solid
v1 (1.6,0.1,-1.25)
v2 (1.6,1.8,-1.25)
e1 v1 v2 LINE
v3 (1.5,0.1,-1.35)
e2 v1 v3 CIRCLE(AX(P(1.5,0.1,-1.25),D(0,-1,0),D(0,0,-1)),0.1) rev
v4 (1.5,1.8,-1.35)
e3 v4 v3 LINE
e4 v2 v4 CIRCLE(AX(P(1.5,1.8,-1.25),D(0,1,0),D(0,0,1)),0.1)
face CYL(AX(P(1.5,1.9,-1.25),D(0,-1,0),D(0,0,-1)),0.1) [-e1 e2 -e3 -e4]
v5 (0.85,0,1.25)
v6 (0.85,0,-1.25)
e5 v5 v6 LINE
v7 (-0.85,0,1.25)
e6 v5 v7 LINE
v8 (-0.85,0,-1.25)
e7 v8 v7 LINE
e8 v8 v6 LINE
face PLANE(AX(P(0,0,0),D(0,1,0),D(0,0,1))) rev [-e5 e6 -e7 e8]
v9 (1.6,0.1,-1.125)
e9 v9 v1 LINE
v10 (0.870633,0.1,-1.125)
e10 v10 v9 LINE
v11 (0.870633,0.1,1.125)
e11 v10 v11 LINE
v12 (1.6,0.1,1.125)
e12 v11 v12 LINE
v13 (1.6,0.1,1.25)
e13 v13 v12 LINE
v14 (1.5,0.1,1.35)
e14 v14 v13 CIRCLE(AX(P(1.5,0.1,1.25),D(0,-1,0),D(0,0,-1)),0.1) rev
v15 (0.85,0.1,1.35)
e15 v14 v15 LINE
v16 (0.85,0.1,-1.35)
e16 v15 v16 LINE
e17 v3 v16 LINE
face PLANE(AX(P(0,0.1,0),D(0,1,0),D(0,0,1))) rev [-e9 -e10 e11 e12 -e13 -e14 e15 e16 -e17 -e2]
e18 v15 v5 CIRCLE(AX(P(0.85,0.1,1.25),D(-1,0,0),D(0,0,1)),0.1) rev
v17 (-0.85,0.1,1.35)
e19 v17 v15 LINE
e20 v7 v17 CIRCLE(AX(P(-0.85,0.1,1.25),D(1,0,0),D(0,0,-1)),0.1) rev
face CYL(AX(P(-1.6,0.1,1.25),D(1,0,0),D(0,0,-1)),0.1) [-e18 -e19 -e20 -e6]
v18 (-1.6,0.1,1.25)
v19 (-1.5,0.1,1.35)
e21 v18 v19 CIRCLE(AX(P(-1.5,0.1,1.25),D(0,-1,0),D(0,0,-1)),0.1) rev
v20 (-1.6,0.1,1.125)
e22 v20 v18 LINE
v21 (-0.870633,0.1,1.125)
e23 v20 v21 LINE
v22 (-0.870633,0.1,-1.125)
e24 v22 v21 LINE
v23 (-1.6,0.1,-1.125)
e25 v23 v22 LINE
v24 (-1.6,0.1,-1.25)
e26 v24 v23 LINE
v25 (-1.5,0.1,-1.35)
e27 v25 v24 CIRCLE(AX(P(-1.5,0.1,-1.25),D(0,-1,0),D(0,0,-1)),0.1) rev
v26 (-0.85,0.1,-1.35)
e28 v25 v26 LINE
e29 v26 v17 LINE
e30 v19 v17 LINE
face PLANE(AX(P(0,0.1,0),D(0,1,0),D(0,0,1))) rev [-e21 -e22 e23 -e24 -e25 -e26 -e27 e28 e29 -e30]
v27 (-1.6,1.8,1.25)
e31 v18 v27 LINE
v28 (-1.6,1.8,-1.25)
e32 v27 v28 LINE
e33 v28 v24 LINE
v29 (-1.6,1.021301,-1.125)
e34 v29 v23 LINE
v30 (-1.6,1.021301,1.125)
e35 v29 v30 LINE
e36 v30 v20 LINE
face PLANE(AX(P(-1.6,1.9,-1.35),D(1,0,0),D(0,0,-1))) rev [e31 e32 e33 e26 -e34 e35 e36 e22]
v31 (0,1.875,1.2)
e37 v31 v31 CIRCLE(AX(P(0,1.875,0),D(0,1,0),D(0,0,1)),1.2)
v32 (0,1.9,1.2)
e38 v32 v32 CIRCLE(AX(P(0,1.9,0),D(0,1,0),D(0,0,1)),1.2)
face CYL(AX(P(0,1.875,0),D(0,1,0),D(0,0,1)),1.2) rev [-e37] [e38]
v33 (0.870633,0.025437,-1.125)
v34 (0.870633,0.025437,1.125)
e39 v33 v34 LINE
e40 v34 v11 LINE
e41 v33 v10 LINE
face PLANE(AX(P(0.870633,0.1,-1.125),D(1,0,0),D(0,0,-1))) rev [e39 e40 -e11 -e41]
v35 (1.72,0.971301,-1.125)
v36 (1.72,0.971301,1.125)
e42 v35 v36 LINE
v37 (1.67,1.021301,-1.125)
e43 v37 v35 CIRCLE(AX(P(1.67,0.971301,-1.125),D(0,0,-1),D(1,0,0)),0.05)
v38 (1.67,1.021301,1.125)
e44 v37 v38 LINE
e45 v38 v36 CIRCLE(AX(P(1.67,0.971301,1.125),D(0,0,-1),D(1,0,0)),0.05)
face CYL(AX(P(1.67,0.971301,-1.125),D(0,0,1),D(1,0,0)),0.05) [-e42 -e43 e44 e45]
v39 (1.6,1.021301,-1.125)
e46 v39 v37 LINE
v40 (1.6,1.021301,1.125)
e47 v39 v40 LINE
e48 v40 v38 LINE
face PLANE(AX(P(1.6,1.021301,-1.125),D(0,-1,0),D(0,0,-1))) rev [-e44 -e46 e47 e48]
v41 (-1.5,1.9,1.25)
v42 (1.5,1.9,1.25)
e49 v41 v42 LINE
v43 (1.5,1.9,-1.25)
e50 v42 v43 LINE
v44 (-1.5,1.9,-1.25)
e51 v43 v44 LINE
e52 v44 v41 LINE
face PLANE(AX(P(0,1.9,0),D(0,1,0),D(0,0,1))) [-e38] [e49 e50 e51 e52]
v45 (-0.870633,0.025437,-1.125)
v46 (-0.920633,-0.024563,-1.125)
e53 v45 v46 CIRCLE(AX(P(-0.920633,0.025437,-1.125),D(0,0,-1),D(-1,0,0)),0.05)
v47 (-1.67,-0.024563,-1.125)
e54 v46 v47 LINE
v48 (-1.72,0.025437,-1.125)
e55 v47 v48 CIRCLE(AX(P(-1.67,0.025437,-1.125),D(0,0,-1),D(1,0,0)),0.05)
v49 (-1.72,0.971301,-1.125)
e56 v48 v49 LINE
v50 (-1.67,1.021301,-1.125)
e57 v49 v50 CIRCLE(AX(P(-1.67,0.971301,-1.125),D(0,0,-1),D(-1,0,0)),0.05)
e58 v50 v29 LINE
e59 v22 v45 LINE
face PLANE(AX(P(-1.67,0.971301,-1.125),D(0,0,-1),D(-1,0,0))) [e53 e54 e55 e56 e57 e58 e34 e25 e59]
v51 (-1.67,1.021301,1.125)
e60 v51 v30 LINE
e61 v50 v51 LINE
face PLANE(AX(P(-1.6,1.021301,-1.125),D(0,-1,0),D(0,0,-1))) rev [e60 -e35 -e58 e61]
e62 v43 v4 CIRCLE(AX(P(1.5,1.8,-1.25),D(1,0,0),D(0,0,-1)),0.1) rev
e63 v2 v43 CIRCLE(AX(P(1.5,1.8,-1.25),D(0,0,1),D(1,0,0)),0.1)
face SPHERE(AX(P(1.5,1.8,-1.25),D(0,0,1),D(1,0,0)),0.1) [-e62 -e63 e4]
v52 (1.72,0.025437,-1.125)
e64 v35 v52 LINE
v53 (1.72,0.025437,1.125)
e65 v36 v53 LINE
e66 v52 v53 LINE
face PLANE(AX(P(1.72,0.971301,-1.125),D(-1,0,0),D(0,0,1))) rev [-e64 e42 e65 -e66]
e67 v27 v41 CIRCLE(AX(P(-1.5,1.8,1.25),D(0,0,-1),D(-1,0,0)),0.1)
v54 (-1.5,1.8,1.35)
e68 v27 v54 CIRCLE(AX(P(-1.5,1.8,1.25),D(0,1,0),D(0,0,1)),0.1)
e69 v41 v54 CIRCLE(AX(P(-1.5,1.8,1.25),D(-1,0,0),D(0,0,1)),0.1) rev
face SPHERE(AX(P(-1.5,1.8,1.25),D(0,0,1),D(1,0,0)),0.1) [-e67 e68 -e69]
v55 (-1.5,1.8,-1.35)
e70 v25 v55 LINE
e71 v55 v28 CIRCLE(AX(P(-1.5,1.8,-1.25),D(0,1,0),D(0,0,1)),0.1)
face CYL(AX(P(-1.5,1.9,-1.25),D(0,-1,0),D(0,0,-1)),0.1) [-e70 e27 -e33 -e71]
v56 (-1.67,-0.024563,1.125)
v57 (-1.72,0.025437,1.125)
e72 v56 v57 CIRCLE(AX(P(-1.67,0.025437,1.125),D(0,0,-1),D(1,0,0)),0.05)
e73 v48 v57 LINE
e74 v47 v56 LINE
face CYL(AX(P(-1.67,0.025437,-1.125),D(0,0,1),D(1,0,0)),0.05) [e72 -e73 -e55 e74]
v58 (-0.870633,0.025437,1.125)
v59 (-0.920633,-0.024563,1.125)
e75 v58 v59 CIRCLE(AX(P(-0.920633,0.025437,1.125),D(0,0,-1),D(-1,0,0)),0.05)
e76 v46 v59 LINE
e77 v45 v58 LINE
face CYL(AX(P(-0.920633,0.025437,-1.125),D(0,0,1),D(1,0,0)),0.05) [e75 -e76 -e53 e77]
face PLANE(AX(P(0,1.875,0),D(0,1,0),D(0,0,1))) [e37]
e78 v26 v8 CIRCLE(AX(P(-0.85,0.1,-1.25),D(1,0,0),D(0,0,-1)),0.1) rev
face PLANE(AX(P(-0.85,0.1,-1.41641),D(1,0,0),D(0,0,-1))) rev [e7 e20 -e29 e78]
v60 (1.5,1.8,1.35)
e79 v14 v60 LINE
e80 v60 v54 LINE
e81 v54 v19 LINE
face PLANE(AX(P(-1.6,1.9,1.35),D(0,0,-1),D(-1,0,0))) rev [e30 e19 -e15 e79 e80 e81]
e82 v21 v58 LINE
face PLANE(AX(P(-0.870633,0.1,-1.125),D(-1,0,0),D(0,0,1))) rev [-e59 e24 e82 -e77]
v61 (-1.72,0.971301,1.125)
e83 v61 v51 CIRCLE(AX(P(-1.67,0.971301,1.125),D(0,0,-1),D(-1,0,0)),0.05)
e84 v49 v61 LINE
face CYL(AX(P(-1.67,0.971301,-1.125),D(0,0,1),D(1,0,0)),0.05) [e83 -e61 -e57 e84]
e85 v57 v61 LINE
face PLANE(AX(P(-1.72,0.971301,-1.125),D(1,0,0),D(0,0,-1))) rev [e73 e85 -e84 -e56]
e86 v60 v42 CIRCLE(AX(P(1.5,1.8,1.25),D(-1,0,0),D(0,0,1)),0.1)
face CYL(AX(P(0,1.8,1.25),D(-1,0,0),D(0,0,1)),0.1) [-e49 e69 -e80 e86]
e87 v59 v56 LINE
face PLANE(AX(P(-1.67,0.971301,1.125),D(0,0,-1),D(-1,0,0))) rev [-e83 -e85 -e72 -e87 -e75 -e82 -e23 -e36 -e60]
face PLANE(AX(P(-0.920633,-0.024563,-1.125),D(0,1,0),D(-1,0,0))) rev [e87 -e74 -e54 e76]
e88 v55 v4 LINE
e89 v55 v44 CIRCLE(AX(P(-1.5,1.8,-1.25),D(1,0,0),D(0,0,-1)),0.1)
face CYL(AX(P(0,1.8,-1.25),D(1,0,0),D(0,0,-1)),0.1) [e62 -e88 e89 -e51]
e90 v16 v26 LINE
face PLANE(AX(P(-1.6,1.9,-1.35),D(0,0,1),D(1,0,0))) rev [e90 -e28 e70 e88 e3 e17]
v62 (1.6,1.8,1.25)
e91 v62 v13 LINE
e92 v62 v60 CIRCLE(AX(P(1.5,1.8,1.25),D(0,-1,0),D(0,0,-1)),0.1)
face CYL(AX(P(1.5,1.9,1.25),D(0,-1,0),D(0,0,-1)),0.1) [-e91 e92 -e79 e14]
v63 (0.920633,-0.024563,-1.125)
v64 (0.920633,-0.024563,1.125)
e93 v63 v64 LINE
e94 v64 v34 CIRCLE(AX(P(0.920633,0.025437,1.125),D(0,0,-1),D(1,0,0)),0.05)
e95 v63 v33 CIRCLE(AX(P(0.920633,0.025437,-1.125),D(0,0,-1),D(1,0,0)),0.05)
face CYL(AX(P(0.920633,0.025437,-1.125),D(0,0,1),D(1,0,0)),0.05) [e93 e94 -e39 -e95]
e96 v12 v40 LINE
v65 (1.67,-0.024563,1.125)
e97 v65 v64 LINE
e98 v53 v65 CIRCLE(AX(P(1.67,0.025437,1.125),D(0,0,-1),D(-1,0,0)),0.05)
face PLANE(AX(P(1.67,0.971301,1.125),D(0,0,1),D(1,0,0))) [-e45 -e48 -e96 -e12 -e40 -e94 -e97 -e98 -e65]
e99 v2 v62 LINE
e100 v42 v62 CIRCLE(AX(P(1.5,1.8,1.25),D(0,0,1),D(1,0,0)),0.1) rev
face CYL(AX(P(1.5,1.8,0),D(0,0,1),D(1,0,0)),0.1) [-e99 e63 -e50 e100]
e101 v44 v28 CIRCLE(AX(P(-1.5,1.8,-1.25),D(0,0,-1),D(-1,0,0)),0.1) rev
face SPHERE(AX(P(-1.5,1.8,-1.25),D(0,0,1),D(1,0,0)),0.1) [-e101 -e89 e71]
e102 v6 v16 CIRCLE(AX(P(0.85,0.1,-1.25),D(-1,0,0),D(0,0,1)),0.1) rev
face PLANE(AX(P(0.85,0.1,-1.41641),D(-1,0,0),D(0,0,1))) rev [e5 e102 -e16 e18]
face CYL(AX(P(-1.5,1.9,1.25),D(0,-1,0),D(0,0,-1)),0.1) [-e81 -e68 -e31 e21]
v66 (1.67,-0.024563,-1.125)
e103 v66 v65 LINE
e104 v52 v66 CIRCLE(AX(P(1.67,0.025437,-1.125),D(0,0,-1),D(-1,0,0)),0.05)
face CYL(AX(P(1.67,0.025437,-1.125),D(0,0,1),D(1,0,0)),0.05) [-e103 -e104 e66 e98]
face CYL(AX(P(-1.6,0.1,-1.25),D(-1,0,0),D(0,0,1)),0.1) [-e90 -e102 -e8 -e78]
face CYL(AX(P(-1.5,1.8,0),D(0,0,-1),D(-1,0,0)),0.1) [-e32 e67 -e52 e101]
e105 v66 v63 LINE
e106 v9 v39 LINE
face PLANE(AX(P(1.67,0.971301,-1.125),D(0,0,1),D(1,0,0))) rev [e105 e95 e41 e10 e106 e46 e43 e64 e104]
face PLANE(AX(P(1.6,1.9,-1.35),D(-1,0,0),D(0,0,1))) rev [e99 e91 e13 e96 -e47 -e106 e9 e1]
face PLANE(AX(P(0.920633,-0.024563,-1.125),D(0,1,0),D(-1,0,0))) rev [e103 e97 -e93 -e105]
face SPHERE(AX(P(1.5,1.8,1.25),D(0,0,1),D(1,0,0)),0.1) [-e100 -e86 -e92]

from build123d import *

# Parameters (mm, degrees)
SKETCH_2_W          = 3.2
SKETCH_2_H          = 2.7
EXTRUDE_1_DEPTH     = 1.9
FILLET_1_R          = 0.1
FILLET_2_R          = 0.1
FILLET_3_R          = 0.1
FILLET_4_R          = 0.1
FILLET_5_R          = 0.1
SKETCH_3_R          = 1.2
CUT_EXTRUDE_1_DEPTH = 0.025
SKETCH_4_W          = 0.827754981
SKETCH_4_H          = 2.835918068
CUT_EXTRUDE_2_DEPTH = 0.1
EXTRUDE_3_DEPTH     = 1.125


with BuildPart() as part:
    # Эскиз2 → Бобышка-Вытянуть1 (new body)
    with BuildSketch(Plane(origin=(0, 0, 0), x_dir=(1, 0, 0), z_dir=(0, 1, 0))):
        Rectangle(SKETCH_2_W, SKETCH_2_H)
    extrude(amount=EXTRUDE_1_DEPTH)

    # Скругление1
    fillet_1_edges = [part.edges().sort_by_distance(p)[0] for p in [
        (-1.6, 1.9, 0),
        (0, 1.9, 1.35),
        (1.6, 1.9, 0),
        (0, 1.9, -1.35),
    ]]
    fillet(fillet_1_edges, radius=FILLET_1_R)

    # Скругление2
    # the kernel refuses this fillet: 0.1 mm, written as the material it takes off along each edge
    with BuildSketch(Plane(origin=(-1.5, 1.8, 1.25), x_dir=(0, 0, 1), z_dir=(-1, 0, 0))) as fillet_2_piece_1_section:
        Polygon((0, 0), (FILLET_2_R, 0), (FILLET_2_R, FILLET_2_R), (0, FILLET_2_R), align=None)
    fillet_2_piece_1 = extrude(amount=FILLET_2_R, mode=Mode.PRIVATE)
    fillet_2_piece_1 = fillet_2_piece_1 - Plane(origin=(-1.5, 1.8, 1.25), x_dir=(0, -0.7071067811865475, -0.7071067811865475), z_dir=(-1, 0, 0)) * Sphere(FILLET_2_R, mode=Mode.PRIVATE)
    add(fillet_2_piece_1, mode=Mode.SUBTRACT)
    with BuildSketch(Plane(origin=(1.5, 1.8, 1.25), x_dir=(0, 0, 1), z_dir=(1, 0, 0))) as fillet_2_piece_2_section:
        Polygon((0, 0), (FILLET_2_R, 0), (FILLET_2_R, -FILLET_2_R), (0, -FILLET_2_R), align=None)
    fillet_2_piece_2 = extrude(amount=FILLET_2_R, mode=Mode.PRIVATE)
    fillet_2_piece_2 = fillet_2_piece_2 - Plane(origin=(1.5, 1.8, 1.25), x_dir=(0, -0.7071067811865475, -0.7071067811865475), z_dir=(1, 0, 0)) * Sphere(FILLET_2_R, mode=Mode.PRIVATE)
    add(fillet_2_piece_2, mode=Mode.SUBTRACT)
    with BuildSketch(Plane(origin=(1.6, -0.25, 1.35), x_dir=(0, 0, -1), z_dir=(0, 1, 0))) as fillet_2_piece_3:
        with BuildLine():
            CenterArc((FILLET_2_R, FILLET_2_R), FILLET_2_R, 180, 90)
            Line((0, FILLET_2_R), (0, 0))
            Line((0, 0), (FILLET_2_R, 0))
        make_face()
    extrude(amount=2.05, mode=Mode.SUBTRACT)
    with BuildSketch(Plane(origin=(-1.6, -0.25, 1.35), x_dir=(0, 0, -1), z_dir=(0, 1, 0))) as fillet_2_piece_4:
        with BuildLine():
            CenterArc((FILLET_2_R, -FILLET_2_R), FILLET_2_R, 90, 90)
            Line((0, -FILLET_2_R), (0, 0))
            Line((0, 0), (FILLET_2_R, 0))
        make_face()
    extrude(amount=2.05, mode=Mode.SUBTRACT)
    with BuildSketch(Plane(origin=(1.85, 0, 1.35), x_dir=(0, 0, -1), z_dir=(-1, 0, 0))) as fillet_2_piece_5:
        with BuildLine():
            CenterArc((FILLET_2_R, -FILLET_2_R), FILLET_2_R, 90, 90)
            Line((0, -FILLET_2_R), (0, 0))
            Line((0, 0), (FILLET_2_R, 0))
        make_face()
    extrude(amount=3.7, mode=Mode.SUBTRACT)

    # Скругление3
    # the kernel refuses this fillet: 0.1 mm, written as the material it takes off along each edge
    with BuildSketch(Plane(origin=(1.5, 1.8, -1.25), x_dir=(1, 0, 0), z_dir=(0, 0, -1))) as fillet_3_piece_1_section:
        Polygon((0, 0), (FILLET_3_R, 0), (FILLET_3_R, -FILLET_3_R), (0, -FILLET_3_R), align=None)
    fillet_3_piece_1 = extrude(amount=FILLET_3_R, mode=Mode.PRIVATE)
    fillet_3_piece_1 = fillet_3_piece_1 - Plane(origin=(1.5, 1.8, -1.25), x_dir=(-0.7071067811865475, -0.7071067811865475, 0), z_dir=(0, 0, -1)) * Sphere(FILLET_3_R, mode=Mode.PRIVATE)
    add(fillet_3_piece_1, mode=Mode.SUBTRACT)
    with BuildSketch(Plane(origin=(1.5, 0.1, 1.25), x_dir=(1, 0, 0), z_dir=(0, -1, 0))) as fillet_3_piece_2_section:
        Polygon((0, 0), (FILLET_3_R, 0), (FILLET_3_R, FILLET_3_R), (0, FILLET_3_R), align=None)
    fillet_3_piece_2 = extrude(amount=FILLET_3_R, mode=Mode.PRIVATE)
    fillet_3_piece_2 = fillet_3_piece_2 - Plane(origin=(1.5, 0.1, 1.25), x_dir=(-0.7071067811865476, 0, -0.7071067811865475), z_dir=(0, -1, 0)) * Sphere(FILLET_3_R, mode=Mode.PRIVATE)
    add(fillet_3_piece_2, mode=Mode.SUBTRACT)
    with BuildSketch(Plane(origin=(1.6, -0.25, -1.35), x_dir=(-1, 0, 0), z_dir=(0, 1, 0))) as fillet_3_piece_3:
        with BuildLine():
            CenterArc((FILLET_3_R, FILLET_3_R), FILLET_3_R, 180, 90)
            Line((0, FILLET_3_R), (0, 0))
            Line((0, 0), (FILLET_3_R, 0))
        make_face()
    extrude(amount=2.05, mode=Mode.SUBTRACT)
    with BuildSketch(Plane(origin=(1.6, 0, -1.6), x_dir=(-1, 0, 0), z_dir=(0, 0, 1))) as fillet_3_piece_4:
        with BuildLine():
            CenterArc((FILLET_3_R, -FILLET_3_R), FILLET_3_R, 90, 90)
            Line((0, -FILLET_3_R), (0, 0))
            Line((0, 0), (FILLET_3_R, 0))
        make_face()
    extrude(amount=2.85, mode=Mode.SUBTRACT)

    # Скругление4
    # the kernel refuses this fillet: 0.1 mm, written as the material it takes off along each edge
    with BuildSketch(Plane(origin=(-1.5, 1.8, -1.25), x_dir=(-1, 0, 0), z_dir=(0, 0, -1))) as fillet_4_piece_1_section:
        Polygon((0, 0), (FILLET_4_R, 0), (FILLET_4_R, FILLET_4_R), (0, FILLET_4_R), align=None)
    fillet_4_piece_1 = extrude(amount=FILLET_4_R, mode=Mode.PRIVATE)
    fillet_4_piece_1 = fillet_4_piece_1 - Plane(origin=(-1.5, 1.8, -1.25), x_dir=(0.7071067811865475, -0.7071067811865475, 0), z_dir=(0, 0, -1)) * Sphere(FILLET_4_R, mode=Mode.PRIVATE)
    add(fillet_4_piece_1, mode=Mode.SUBTRACT)
    with BuildSketch(Plane(origin=(1.5, 0.1, -1.25), x_dir=(0, -1, 0), z_dir=(0, 0, -1))) as fillet_4_piece_2_section:
        Polygon((0, 0), (FILLET_4_R, 0), (FILLET_4_R, -FILLET_4_R), (0, -FILLET_4_R), align=None)
    fillet_4_piece_2 = extrude(amount=FILLET_4_R, mode=Mode.PRIVATE)
    fillet_4_piece_2 = fillet_4_piece_2 - Plane(origin=(1.5, 0.1, -1.25), x_dir=(-0.7071067811865475, 0.7071067811865475, 0), z_dir=(0, 0, -1)) * Sphere(FILLET_4_R, mode=Mode.PRIVATE)
    add(fillet_4_piece_2, mode=Mode.SUBTRACT)
    with BuildSketch(Plane(origin=(-1.6, -0.25, -1.35), x_dir=(1, 0, 0), z_dir=(0, 1, 0))) as fillet_4_piece_3:
        with BuildLine():
            CenterArc((FILLET_4_R, -FILLET_4_R), FILLET_4_R, 90, 90)
            Line((0, -FILLET_4_R), (0, 0))
            Line((0, 0), (FILLET_4_R, 0))
        make_face()
    extrude(amount=2.05, mode=Mode.SUBTRACT)
    with BuildSketch(Plane(origin=(-1.85, 0, -1.35), x_dir=(0, 1, 0), z_dir=(1, 0, 0))) as fillet_4_piece_4:
        with BuildLine():
            CenterArc((FILLET_4_R, FILLET_4_R), FILLET_4_R, 180, 90)
            Line((0, FILLET_4_R), (0, 0))
            Line((0, 0), (FILLET_4_R, 0))
        make_face()
    extrude(amount=3.35, mode=Mode.SUBTRACT)

    # Скругление5
    # the kernel refuses this fillet: 0.1 mm, written as the material it takes off along each edge
    with BuildSketch(Plane(origin=(-1.5, 0.1, 1.25), x_dir=(-1, 0, 0), z_dir=(0, -1, 0))) as fillet_5_piece_1_section:
        Polygon((0, 0), (FILLET_5_R, 0), (FILLET_5_R, -FILLET_5_R), (0, -FILLET_5_R), align=None)
    fillet_5_piece_1 = extrude(amount=FILLET_5_R, mode=Mode.PRIVATE)
    fillet_5_piece_1 = fillet_5_piece_1 - Plane(origin=(-1.5, 0.1, 1.25), x_dir=(0.7071067811865475, 0, -0.7071067811865477), z_dir=(0, -1, 0)) * Sphere(FILLET_5_R, mode=Mode.PRIVATE)
    add(fillet_5_piece_1, mode=Mode.SUBTRACT)
    with BuildSketch(Plane(origin=(-1.5, 0.1, -1.25), x_dir=(-1, 0, 0), z_dir=(0, -1, 0))) as fillet_5_piece_2_section:
        Polygon((0, 0), (FILLET_5_R, 0), (FILLET_5_R, FILLET_5_R), (0, FILLET_5_R), align=None)
    fillet_5_piece_2 = extrude(amount=FILLET_5_R, mode=Mode.PRIVATE)
    fillet_5_piece_2 = fillet_5_piece_2 - Plane(origin=(-1.5, 0.1, -1.25), x_dir=(0.7071067811865476, 0, 0.7071067811865475), z_dir=(0, -1, 0)) * Sphere(FILLET_5_R, mode=Mode.PRIVATE)
    add(fillet_5_piece_2, mode=Mode.SUBTRACT)
    with BuildSketch(Plane(origin=(-1.6, 0, 1.25), x_dir=(1, 0, 0), z_dir=(0, 0, -1))) as fillet_5_piece_3:
        with BuildLine():
            CenterArc((FILLET_5_R, -FILLET_5_R), FILLET_5_R, 90, 90)
            Line((0, -FILLET_5_R), (0, 0))
            Line((0, 0), (FILLET_5_R, 0))
        make_face()
    extrude(amount=2.5, mode=Mode.SUBTRACT)

    # Эскиз3 → Вырез-Вытянуть1 (cut)
    with BuildSketch(Plane(origin=(0, 1.9, 0), x_dir=(1, 0, 0), z_dir=(0, 1, 0))):
        with Locations(Location((0, 0, 0), (0, 0, 270))):
            Circle(SKETCH_3_R)
    extrude(amount=-CUT_EXTRUDE_1_DEPTH, mode=Mode.SUBTRACT)

    # Эскиз4 → Вырез-Вытянуть2 (cut)
    with BuildSketch(Plane.XZ):
        with Locations((1.263877491, 0.001548995)):
            Rectangle(SKETCH_4_W, SKETCH_4_H)
        with Locations((-1.263877491, 0.001548995)):
            Rectangle(SKETCH_4_W, SKETCH_4_H)
    extrude(amount=-CUT_EXTRUDE_2_DEPTH, mode=Mode.SUBTRACT)

    # Эскиз6 → Бобышка-Вытянуть3 (add, symmetric)
    with BuildSketch(Plane(origin=(0, 0, 0), x_dir=(-1, 0, 0), z_dir=(0, 0, -1))):
        with BuildLine():
            Line((1.6, 0.1), (0.87063337, 0.1))
            Line((0.87063337, 0.1), (0.87063337, 0.025437095))
            ThreePointArc((0.87063337, 0.025437095), (0.885278031, -0.009918244), (0.92063337, -0.024562905))
            Line((0.92063337, -0.024562905), (1.67, -0.024562905))
            ThreePointArc((1.67, -0.024562905), (1.705355339, -0.009918244), (1.72, 0.025437095))
            Line((1.72, 0.025437095), (1.72, 0.971300934))
            ThreePointArc((1.72, 0.971300934), (1.705355339, 1.006656273), (1.67, 1.021300934))
            Line((1.67, 1.021300934), (1.6, 1.021300934))
            Line((1.6, 1.021300934), (1.6, 0.1))
        make_face()
        with BuildLine():
            Line((-1.6, 1.021300934), (-1.67, 1.021300934))
            ThreePointArc((-1.67, 1.021300934), (-1.705355339, 1.006656273), (-1.72, 0.971300934))
            Line((-1.72, 0.971300934), (-1.72, 0.025437095))
            ThreePointArc((-1.72, 0.025437095), (-1.705355339, -0.009918244), (-1.67, -0.024562905))
            Line((-1.67, -0.024562905), (-0.92063337, -0.024562905))
            ThreePointArc((-0.92063337, -0.024562905), (-0.885278031, -0.009918244), (-0.87063337, 0.025437095))
            Line((-0.87063337, 0.025437095), (-0.87063337, 0.1))
            Line((-0.87063337, 0.1), (-1.6, 0.1))
            Line((-1.6, 0.1), (-1.6, 1.021300934))
        make_face()
    extrude(amount=EXTRUDE_3_DEPTH, both=True)


solid = part.part
